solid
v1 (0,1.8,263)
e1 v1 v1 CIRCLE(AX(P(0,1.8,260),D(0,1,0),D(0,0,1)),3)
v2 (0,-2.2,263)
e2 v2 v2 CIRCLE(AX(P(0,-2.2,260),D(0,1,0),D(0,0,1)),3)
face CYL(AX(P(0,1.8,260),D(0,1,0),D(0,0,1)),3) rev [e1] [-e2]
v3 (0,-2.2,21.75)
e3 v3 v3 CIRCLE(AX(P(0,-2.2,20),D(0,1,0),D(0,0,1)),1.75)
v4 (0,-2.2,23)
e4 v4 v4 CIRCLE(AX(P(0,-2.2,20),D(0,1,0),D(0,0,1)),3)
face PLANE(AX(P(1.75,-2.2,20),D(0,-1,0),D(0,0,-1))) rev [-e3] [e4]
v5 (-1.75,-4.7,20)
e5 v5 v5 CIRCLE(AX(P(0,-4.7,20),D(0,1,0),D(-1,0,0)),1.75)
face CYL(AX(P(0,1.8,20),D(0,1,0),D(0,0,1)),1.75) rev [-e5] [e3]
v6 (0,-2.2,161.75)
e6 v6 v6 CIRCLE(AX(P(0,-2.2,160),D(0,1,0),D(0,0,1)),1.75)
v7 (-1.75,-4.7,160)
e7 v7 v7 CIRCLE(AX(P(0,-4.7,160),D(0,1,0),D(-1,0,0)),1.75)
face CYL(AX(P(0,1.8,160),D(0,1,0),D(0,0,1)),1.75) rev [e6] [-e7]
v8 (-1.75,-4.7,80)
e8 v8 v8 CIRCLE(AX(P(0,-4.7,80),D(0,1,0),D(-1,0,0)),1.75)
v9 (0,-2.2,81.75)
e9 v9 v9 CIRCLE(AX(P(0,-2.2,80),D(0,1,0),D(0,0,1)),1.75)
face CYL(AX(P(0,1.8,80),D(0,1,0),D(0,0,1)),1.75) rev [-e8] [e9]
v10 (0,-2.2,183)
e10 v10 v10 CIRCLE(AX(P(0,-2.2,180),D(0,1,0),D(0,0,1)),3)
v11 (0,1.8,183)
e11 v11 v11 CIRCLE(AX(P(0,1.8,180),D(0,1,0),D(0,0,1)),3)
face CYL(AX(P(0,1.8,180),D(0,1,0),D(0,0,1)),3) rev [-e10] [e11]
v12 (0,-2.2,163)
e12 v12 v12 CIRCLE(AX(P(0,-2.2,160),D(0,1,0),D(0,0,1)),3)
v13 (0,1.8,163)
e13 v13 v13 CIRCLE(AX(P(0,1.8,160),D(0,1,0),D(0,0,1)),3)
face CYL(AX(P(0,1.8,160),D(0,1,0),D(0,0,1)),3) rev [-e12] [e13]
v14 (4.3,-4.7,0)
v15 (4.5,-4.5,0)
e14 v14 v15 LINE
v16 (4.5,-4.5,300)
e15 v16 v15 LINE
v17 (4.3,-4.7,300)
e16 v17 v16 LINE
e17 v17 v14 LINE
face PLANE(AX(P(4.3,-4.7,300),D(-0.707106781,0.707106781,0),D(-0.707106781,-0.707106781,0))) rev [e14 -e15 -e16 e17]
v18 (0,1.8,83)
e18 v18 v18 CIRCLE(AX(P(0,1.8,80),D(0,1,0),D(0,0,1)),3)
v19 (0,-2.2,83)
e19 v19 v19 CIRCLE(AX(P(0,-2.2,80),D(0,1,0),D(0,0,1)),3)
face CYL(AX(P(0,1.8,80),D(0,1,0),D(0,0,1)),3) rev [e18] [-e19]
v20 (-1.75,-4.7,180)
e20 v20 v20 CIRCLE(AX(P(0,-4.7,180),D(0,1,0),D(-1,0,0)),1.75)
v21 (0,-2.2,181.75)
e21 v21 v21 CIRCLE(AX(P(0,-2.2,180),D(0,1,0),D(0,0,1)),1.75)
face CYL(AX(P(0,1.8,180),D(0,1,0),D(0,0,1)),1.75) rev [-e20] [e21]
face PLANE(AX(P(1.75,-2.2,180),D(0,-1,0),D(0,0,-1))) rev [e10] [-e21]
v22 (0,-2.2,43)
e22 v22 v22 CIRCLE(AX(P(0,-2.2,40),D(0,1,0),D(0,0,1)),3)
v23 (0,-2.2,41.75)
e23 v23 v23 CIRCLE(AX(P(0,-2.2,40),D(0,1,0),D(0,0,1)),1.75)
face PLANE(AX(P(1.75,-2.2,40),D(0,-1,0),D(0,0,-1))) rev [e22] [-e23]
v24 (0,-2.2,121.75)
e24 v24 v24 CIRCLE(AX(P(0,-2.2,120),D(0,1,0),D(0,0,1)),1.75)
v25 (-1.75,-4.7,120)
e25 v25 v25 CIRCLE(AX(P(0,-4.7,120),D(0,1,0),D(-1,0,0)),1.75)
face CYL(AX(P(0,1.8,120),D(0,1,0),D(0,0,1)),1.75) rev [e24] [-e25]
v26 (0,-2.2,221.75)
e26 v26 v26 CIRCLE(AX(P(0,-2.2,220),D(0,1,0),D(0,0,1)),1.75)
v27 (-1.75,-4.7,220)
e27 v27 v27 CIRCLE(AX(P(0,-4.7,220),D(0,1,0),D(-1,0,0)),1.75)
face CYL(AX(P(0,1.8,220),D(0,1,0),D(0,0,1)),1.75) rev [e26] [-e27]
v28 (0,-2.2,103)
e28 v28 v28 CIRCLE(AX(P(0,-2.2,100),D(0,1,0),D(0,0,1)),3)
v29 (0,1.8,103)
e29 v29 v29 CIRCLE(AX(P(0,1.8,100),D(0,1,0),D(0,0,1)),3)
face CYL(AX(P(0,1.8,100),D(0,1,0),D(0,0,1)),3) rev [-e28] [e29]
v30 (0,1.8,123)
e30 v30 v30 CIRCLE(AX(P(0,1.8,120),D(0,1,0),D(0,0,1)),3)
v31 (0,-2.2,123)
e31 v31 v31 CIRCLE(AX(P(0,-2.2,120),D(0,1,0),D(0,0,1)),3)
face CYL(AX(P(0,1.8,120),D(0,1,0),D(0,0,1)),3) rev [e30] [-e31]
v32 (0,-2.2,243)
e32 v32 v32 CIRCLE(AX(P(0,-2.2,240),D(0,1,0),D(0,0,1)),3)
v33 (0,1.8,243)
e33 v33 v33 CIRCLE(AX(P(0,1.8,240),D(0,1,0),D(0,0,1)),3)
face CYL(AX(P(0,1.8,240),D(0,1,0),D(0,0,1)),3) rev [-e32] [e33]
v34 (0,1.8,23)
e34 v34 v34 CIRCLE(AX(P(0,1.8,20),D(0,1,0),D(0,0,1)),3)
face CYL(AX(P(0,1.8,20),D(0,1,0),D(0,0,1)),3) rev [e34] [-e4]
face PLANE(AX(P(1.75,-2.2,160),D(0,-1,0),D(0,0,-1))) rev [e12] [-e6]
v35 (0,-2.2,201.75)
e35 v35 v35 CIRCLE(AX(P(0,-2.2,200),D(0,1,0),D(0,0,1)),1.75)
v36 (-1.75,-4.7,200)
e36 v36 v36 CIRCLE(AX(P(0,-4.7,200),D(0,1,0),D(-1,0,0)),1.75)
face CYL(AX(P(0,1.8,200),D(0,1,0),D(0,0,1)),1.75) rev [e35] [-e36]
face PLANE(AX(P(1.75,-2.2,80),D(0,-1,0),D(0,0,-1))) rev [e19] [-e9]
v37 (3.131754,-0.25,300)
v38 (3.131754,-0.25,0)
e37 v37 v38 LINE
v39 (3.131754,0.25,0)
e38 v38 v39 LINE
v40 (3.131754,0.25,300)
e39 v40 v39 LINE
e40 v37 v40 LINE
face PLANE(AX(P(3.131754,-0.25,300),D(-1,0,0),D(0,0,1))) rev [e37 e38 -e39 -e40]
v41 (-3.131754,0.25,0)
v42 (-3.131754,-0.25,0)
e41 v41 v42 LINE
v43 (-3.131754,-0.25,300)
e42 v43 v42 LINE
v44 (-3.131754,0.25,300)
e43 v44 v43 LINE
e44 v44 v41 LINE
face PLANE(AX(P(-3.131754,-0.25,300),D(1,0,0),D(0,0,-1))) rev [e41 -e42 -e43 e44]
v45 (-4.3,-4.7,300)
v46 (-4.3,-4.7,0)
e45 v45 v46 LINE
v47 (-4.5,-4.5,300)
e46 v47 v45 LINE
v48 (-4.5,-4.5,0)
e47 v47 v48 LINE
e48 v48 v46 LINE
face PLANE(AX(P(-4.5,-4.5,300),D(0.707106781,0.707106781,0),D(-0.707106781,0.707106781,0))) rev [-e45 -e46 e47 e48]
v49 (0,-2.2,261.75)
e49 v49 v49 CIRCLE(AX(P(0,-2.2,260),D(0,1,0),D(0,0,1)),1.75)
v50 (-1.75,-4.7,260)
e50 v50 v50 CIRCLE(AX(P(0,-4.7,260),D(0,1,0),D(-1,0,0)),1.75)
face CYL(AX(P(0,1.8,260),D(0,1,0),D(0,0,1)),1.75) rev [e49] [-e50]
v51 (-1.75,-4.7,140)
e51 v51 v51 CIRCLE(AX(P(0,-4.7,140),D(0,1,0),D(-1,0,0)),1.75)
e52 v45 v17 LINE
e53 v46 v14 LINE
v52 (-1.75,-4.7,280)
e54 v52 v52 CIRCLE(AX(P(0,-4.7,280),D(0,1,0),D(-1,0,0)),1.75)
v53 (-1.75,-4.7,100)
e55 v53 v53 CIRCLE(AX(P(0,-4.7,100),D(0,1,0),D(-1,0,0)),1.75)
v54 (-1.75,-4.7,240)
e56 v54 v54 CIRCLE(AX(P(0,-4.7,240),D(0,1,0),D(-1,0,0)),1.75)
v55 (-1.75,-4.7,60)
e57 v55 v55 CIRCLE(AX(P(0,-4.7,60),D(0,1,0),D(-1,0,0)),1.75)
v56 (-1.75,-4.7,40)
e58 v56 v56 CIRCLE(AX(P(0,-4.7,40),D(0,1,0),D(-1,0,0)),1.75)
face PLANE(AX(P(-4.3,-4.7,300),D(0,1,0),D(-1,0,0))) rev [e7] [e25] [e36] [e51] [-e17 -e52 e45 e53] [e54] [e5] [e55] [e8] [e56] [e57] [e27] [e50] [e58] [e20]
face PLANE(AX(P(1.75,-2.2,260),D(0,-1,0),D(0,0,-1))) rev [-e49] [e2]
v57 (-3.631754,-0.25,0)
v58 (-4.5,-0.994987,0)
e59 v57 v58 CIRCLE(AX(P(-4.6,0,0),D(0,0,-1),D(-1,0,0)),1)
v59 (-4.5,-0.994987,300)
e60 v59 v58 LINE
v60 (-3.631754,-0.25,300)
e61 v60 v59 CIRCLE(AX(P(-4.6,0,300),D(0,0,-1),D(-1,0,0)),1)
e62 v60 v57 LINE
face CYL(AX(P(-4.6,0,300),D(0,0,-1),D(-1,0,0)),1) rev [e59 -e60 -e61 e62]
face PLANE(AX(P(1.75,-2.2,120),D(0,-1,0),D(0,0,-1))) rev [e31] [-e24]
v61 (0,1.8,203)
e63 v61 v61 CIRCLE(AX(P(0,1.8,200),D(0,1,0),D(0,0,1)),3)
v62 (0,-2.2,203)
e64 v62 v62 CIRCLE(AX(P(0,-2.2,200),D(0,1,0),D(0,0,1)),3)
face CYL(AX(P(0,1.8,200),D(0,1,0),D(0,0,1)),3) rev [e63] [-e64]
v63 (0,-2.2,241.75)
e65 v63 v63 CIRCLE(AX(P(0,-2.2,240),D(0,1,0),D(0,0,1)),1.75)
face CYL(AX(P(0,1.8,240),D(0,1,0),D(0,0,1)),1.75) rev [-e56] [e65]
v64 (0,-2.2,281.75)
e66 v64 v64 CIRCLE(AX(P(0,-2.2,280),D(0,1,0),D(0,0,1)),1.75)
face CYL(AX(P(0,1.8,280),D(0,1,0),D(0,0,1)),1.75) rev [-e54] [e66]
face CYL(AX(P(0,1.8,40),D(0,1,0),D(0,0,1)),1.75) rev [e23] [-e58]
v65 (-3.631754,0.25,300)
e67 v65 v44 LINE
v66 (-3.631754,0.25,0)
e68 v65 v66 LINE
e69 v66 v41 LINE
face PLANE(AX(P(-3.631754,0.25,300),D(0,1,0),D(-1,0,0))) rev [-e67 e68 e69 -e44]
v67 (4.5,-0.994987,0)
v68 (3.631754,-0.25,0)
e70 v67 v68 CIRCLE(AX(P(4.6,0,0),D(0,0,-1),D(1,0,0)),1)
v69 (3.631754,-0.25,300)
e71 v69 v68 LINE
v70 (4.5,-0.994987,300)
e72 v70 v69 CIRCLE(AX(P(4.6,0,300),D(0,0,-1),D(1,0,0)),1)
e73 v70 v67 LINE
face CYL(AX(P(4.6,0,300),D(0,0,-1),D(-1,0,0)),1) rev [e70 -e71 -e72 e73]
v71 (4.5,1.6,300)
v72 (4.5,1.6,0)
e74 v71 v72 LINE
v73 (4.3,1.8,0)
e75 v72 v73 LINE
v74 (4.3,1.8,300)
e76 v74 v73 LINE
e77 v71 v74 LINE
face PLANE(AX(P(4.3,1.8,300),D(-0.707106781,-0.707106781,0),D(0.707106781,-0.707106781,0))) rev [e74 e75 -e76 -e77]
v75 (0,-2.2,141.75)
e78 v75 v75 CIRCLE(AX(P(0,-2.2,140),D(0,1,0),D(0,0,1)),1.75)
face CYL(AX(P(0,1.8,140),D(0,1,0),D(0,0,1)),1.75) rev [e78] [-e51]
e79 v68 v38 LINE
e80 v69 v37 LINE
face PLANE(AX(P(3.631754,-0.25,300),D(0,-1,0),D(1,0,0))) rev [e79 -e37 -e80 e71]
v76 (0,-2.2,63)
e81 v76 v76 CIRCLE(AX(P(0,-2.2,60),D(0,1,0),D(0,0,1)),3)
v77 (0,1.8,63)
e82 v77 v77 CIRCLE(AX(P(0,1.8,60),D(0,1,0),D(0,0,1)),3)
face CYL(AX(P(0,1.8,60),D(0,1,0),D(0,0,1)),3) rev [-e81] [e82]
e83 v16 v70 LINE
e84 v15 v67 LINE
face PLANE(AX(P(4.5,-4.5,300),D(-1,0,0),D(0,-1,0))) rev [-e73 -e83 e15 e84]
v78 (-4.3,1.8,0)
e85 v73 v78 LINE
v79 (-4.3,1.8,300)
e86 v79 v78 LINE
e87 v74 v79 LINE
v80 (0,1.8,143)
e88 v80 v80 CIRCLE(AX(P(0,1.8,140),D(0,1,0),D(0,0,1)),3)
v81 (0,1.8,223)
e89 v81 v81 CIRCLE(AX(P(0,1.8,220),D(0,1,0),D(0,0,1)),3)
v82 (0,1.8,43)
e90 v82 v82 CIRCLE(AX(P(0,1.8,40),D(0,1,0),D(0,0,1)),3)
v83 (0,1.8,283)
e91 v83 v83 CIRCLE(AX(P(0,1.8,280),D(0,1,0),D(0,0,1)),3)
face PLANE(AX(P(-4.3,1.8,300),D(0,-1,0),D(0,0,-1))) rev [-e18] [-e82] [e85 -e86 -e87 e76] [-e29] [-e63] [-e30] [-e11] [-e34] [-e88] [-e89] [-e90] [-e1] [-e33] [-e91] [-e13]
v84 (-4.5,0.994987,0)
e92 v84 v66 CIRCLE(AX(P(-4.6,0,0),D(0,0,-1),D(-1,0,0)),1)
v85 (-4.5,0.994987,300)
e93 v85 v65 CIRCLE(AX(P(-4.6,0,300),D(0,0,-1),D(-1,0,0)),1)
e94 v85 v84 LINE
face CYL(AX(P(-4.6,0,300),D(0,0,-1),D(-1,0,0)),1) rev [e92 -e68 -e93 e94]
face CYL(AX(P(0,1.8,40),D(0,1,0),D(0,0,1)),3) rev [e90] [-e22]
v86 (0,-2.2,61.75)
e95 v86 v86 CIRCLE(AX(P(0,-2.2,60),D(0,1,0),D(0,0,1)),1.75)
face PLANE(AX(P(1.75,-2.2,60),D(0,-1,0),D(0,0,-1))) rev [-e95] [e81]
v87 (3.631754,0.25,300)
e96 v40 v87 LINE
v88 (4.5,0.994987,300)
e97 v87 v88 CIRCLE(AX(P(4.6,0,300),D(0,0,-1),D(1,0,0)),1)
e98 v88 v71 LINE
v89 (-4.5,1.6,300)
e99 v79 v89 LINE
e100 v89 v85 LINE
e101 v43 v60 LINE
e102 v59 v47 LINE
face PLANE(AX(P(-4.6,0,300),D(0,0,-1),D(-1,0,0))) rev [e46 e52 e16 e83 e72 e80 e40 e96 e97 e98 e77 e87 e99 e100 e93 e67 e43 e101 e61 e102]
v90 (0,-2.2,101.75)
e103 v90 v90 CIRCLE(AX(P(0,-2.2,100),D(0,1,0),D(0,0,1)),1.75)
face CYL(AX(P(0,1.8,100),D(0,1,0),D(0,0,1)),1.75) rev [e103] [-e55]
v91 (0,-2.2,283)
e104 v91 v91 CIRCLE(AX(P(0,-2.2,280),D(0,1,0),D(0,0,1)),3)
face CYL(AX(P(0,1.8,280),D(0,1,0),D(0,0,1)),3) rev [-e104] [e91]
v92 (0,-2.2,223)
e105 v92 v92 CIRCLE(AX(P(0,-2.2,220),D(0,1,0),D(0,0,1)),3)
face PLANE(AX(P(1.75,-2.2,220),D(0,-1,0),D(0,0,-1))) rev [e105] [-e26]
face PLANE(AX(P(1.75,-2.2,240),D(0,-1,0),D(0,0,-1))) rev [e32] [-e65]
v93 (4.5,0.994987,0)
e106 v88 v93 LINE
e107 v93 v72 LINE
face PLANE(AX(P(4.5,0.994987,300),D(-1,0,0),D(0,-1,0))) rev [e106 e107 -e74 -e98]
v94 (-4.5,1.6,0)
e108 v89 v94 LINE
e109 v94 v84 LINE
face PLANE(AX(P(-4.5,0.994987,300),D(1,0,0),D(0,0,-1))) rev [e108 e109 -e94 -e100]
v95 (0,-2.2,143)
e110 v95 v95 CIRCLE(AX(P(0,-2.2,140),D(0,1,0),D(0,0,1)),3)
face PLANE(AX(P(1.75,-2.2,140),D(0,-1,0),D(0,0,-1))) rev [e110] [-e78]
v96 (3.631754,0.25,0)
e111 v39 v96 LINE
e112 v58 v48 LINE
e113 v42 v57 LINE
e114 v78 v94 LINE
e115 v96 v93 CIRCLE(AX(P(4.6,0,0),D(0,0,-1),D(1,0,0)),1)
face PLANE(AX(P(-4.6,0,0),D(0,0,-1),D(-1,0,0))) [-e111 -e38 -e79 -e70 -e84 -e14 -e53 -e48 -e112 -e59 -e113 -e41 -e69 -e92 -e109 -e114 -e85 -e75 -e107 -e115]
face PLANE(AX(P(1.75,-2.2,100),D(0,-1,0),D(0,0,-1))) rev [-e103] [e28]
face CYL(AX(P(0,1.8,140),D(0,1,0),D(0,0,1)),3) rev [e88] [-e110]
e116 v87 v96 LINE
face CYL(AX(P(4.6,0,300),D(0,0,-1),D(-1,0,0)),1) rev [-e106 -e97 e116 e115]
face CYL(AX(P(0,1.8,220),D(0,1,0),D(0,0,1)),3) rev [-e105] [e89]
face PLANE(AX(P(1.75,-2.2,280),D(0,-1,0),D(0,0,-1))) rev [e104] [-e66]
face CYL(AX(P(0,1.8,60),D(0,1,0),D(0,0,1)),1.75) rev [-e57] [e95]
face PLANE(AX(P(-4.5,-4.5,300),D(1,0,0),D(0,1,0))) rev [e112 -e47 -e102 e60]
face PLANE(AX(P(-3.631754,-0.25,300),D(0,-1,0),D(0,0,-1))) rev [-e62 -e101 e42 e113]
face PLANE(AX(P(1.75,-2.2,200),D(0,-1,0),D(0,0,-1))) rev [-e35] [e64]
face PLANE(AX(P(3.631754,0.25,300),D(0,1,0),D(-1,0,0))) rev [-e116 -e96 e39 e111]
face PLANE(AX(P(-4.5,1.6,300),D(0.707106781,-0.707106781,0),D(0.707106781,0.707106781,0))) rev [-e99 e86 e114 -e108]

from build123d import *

# Parameters (mm, degrees)
EXTRUDE_RAIL_PROFILE_DEPTH        = 300
INITIAL_MOUNTING_HOLE_D           = 3.5
INITIAL_MOUNTING_HOLE_CBORE_D     = 6
INITIAL_MOUNTING_HOLE_CBORE_DEPTH = 4
FILL_START                        = -2.2
FILL_PATTERN_OUTLINE_R            = 3
FILL_PATTERN_DEPTH                = 4
FILL_START_2                      = -4.7
FILL_PATTERN_2_OUTLINE_R          = 1.75
FILL_PATTERN_2_DEPTH              = 2.5


# Read off the part's stored shape, not the designer's step: Fill Pattern
with BuildPart() as part:
    # Rail Profile Sketch → Extrude Rail Profile (new body)
    with BuildSketch(Plane.XY):
        with BuildLine():
            Line((-4.3, -4.7), (4.3, -4.7))
            Line((4.3, -4.7), (4.5, -4.5))
            Line((4.5, -4.5), (4.5, -0.994987437))
            ThreePointArc((4.5, -0.994987437), (3.948817336, -0.758921035), (3.631754163, -0.25))
            Line((3.631754163, -0.25), (3.131754163, -0.25))
            Line((3.131754163, -0.25), (3.131754163, 0.25))
            Line((3.131754163, 0.25), (3.631754163, 0.25))
            ThreePointArc((3.631754163, 0.25), (3.948817336, 0.758921035), (4.5, 0.994987437))
            Line((4.5, 0.994987437), (4.5, 1.6))
            Line((4.5, 1.6), (4.3, 1.8))
            Line((4.3, 1.8), (-4.3, 1.8))
            Line((-4.3, 1.8), (-4.5, 1.6))
            Line((-4.5, 1.6), (-4.5, 0.994987437))
            ThreePointArc((-4.5, 0.994987437), (-3.948817336, 0.758921035), (-3.631754163, 0.25))
            Line((-3.631754163, 0.25), (-3.131754163, 0.25))
            Line((-3.131754163, 0.25), (-3.131754163, -0.25))
            Line((-3.131754163, -0.25), (-3.631754163, -0.25))
            ThreePointArc((-3.631754163, -0.25), (-3.948817336, -0.758921035), (-4.5, -0.994987437))
            Line((-4.5, -0.994987437), (-4.5, -4.5))
            Line((-4.5, -4.5), (-4.3, -4.7))
        make_face()
    extrude(amount=EXTRUDE_RAIL_PROFILE_DEPTH)

    # Initial Mounting Hole (through all)
    with Locations(Plane(origin=(0, 1.8, 0), x_dir=(1, 0, 0), z_dir=(0, 1, 0))):
        with Locations((0, -140)):
            CounterBoreHole(INITIAL_MOUNTING_HOLE_D / 2, INITIAL_MOUNTING_HOLE_CBORE_D / 2, INITIAL_MOUNTING_HOLE_CBORE_DEPTH)

    # Fill Pattern outline → Fill Pattern (cut)
    with BuildSketch(Plane(origin=(0, 0, 0), x_dir=(1, 0, 0), z_dir=(0, 1, 0)).offset(FILL_START)):
        with Locations((0, -120)):
            Circle(FILL_PATTERN_OUTLINE_R)
        with Locations((0, -160)):
            Circle(FILL_PATTERN_OUTLINE_R)
        with Locations((0, -100)):
            Circle(FILL_PATTERN_OUTLINE_R)
        with Locations((0, -180)):
            Circle(FILL_PATTERN_OUTLINE_R)
        with Locations((0, -80)):
            Circle(FILL_PATTERN_OUTLINE_R)
        with Locations((0, -200)):
            Circle(FILL_PATTERN_OUTLINE_R)
        with Locations((0, -60)):
            Circle(FILL_PATTERN_OUTLINE_R)
        with Locations((0, -220)):
            Circle(FILL_PATTERN_OUTLINE_R)
        with Locations((0, -40)):
            Circle(FILL_PATTERN_OUTLINE_R)
        with Locations((0, -240)):
            Circle(FILL_PATTERN_OUTLINE_R)
        with Locations((0, -20)):
            Circle(FILL_PATTERN_OUTLINE_R)
        with Locations((0, -260)):
            Circle(FILL_PATTERN_OUTLINE_R)
        with Locations((0, -280)):
            Circle(FILL_PATTERN_OUTLINE_R)
    extrude(amount=FILL_PATTERN_DEPTH, mode=Mode.SUBTRACT)

    # Fill Pattern 2 outline → Fill Pattern 2 (cut)
    with BuildSketch(Plane(origin=(0, 0, 0), x_dir=(1, 0, 0), z_dir=(0, 1, 0)).offset(FILL_START_2)):
        with Locations((0, -120)):
            Circle(FILL_PATTERN_2_OUTLINE_R)
        with Locations((0, -160)):
            Circle(FILL_PATTERN_2_OUTLINE_R)
        with Locations((0, -100)):
            Circle(FILL_PATTERN_2_OUTLINE_R)
        with Locations((0, -180)):
            Circle(FILL_PATTERN_2_OUTLINE_R)
        with Locations((0, -80)):
            Circle(FILL_PATTERN_2_OUTLINE_R)
        with Locations((0, -200)):
            Circle(FILL_PATTERN_2_OUTLINE_R)
        with Locations((0, -60)):
            Circle(FILL_PATTERN_2_OUTLINE_R)
        with Locations((0, -220)):
            Circle(FILL_PATTERN_2_OUTLINE_R)
        with Locations((0, -40)):
            Circle(FILL_PATTERN_2_OUTLINE_R)
        with Locations((0, -240)):
            Circle(FILL_PATTERN_2_OUTLINE_R)
        with Locations((0, -20)):
            Circle(FILL_PATTERN_2_OUTLINE_R)
        with Locations((0, -260)):
            Circle(FILL_PATTERN_2_OUTLINE_R)
        with Locations((0, -280)):
            Circle(FILL_PATTERN_2_OUTLINE_R)
    extrude(amount=FILL_PATTERN_2_DEPTH, mode=Mode.SUBTRACT)


solid = part.part
